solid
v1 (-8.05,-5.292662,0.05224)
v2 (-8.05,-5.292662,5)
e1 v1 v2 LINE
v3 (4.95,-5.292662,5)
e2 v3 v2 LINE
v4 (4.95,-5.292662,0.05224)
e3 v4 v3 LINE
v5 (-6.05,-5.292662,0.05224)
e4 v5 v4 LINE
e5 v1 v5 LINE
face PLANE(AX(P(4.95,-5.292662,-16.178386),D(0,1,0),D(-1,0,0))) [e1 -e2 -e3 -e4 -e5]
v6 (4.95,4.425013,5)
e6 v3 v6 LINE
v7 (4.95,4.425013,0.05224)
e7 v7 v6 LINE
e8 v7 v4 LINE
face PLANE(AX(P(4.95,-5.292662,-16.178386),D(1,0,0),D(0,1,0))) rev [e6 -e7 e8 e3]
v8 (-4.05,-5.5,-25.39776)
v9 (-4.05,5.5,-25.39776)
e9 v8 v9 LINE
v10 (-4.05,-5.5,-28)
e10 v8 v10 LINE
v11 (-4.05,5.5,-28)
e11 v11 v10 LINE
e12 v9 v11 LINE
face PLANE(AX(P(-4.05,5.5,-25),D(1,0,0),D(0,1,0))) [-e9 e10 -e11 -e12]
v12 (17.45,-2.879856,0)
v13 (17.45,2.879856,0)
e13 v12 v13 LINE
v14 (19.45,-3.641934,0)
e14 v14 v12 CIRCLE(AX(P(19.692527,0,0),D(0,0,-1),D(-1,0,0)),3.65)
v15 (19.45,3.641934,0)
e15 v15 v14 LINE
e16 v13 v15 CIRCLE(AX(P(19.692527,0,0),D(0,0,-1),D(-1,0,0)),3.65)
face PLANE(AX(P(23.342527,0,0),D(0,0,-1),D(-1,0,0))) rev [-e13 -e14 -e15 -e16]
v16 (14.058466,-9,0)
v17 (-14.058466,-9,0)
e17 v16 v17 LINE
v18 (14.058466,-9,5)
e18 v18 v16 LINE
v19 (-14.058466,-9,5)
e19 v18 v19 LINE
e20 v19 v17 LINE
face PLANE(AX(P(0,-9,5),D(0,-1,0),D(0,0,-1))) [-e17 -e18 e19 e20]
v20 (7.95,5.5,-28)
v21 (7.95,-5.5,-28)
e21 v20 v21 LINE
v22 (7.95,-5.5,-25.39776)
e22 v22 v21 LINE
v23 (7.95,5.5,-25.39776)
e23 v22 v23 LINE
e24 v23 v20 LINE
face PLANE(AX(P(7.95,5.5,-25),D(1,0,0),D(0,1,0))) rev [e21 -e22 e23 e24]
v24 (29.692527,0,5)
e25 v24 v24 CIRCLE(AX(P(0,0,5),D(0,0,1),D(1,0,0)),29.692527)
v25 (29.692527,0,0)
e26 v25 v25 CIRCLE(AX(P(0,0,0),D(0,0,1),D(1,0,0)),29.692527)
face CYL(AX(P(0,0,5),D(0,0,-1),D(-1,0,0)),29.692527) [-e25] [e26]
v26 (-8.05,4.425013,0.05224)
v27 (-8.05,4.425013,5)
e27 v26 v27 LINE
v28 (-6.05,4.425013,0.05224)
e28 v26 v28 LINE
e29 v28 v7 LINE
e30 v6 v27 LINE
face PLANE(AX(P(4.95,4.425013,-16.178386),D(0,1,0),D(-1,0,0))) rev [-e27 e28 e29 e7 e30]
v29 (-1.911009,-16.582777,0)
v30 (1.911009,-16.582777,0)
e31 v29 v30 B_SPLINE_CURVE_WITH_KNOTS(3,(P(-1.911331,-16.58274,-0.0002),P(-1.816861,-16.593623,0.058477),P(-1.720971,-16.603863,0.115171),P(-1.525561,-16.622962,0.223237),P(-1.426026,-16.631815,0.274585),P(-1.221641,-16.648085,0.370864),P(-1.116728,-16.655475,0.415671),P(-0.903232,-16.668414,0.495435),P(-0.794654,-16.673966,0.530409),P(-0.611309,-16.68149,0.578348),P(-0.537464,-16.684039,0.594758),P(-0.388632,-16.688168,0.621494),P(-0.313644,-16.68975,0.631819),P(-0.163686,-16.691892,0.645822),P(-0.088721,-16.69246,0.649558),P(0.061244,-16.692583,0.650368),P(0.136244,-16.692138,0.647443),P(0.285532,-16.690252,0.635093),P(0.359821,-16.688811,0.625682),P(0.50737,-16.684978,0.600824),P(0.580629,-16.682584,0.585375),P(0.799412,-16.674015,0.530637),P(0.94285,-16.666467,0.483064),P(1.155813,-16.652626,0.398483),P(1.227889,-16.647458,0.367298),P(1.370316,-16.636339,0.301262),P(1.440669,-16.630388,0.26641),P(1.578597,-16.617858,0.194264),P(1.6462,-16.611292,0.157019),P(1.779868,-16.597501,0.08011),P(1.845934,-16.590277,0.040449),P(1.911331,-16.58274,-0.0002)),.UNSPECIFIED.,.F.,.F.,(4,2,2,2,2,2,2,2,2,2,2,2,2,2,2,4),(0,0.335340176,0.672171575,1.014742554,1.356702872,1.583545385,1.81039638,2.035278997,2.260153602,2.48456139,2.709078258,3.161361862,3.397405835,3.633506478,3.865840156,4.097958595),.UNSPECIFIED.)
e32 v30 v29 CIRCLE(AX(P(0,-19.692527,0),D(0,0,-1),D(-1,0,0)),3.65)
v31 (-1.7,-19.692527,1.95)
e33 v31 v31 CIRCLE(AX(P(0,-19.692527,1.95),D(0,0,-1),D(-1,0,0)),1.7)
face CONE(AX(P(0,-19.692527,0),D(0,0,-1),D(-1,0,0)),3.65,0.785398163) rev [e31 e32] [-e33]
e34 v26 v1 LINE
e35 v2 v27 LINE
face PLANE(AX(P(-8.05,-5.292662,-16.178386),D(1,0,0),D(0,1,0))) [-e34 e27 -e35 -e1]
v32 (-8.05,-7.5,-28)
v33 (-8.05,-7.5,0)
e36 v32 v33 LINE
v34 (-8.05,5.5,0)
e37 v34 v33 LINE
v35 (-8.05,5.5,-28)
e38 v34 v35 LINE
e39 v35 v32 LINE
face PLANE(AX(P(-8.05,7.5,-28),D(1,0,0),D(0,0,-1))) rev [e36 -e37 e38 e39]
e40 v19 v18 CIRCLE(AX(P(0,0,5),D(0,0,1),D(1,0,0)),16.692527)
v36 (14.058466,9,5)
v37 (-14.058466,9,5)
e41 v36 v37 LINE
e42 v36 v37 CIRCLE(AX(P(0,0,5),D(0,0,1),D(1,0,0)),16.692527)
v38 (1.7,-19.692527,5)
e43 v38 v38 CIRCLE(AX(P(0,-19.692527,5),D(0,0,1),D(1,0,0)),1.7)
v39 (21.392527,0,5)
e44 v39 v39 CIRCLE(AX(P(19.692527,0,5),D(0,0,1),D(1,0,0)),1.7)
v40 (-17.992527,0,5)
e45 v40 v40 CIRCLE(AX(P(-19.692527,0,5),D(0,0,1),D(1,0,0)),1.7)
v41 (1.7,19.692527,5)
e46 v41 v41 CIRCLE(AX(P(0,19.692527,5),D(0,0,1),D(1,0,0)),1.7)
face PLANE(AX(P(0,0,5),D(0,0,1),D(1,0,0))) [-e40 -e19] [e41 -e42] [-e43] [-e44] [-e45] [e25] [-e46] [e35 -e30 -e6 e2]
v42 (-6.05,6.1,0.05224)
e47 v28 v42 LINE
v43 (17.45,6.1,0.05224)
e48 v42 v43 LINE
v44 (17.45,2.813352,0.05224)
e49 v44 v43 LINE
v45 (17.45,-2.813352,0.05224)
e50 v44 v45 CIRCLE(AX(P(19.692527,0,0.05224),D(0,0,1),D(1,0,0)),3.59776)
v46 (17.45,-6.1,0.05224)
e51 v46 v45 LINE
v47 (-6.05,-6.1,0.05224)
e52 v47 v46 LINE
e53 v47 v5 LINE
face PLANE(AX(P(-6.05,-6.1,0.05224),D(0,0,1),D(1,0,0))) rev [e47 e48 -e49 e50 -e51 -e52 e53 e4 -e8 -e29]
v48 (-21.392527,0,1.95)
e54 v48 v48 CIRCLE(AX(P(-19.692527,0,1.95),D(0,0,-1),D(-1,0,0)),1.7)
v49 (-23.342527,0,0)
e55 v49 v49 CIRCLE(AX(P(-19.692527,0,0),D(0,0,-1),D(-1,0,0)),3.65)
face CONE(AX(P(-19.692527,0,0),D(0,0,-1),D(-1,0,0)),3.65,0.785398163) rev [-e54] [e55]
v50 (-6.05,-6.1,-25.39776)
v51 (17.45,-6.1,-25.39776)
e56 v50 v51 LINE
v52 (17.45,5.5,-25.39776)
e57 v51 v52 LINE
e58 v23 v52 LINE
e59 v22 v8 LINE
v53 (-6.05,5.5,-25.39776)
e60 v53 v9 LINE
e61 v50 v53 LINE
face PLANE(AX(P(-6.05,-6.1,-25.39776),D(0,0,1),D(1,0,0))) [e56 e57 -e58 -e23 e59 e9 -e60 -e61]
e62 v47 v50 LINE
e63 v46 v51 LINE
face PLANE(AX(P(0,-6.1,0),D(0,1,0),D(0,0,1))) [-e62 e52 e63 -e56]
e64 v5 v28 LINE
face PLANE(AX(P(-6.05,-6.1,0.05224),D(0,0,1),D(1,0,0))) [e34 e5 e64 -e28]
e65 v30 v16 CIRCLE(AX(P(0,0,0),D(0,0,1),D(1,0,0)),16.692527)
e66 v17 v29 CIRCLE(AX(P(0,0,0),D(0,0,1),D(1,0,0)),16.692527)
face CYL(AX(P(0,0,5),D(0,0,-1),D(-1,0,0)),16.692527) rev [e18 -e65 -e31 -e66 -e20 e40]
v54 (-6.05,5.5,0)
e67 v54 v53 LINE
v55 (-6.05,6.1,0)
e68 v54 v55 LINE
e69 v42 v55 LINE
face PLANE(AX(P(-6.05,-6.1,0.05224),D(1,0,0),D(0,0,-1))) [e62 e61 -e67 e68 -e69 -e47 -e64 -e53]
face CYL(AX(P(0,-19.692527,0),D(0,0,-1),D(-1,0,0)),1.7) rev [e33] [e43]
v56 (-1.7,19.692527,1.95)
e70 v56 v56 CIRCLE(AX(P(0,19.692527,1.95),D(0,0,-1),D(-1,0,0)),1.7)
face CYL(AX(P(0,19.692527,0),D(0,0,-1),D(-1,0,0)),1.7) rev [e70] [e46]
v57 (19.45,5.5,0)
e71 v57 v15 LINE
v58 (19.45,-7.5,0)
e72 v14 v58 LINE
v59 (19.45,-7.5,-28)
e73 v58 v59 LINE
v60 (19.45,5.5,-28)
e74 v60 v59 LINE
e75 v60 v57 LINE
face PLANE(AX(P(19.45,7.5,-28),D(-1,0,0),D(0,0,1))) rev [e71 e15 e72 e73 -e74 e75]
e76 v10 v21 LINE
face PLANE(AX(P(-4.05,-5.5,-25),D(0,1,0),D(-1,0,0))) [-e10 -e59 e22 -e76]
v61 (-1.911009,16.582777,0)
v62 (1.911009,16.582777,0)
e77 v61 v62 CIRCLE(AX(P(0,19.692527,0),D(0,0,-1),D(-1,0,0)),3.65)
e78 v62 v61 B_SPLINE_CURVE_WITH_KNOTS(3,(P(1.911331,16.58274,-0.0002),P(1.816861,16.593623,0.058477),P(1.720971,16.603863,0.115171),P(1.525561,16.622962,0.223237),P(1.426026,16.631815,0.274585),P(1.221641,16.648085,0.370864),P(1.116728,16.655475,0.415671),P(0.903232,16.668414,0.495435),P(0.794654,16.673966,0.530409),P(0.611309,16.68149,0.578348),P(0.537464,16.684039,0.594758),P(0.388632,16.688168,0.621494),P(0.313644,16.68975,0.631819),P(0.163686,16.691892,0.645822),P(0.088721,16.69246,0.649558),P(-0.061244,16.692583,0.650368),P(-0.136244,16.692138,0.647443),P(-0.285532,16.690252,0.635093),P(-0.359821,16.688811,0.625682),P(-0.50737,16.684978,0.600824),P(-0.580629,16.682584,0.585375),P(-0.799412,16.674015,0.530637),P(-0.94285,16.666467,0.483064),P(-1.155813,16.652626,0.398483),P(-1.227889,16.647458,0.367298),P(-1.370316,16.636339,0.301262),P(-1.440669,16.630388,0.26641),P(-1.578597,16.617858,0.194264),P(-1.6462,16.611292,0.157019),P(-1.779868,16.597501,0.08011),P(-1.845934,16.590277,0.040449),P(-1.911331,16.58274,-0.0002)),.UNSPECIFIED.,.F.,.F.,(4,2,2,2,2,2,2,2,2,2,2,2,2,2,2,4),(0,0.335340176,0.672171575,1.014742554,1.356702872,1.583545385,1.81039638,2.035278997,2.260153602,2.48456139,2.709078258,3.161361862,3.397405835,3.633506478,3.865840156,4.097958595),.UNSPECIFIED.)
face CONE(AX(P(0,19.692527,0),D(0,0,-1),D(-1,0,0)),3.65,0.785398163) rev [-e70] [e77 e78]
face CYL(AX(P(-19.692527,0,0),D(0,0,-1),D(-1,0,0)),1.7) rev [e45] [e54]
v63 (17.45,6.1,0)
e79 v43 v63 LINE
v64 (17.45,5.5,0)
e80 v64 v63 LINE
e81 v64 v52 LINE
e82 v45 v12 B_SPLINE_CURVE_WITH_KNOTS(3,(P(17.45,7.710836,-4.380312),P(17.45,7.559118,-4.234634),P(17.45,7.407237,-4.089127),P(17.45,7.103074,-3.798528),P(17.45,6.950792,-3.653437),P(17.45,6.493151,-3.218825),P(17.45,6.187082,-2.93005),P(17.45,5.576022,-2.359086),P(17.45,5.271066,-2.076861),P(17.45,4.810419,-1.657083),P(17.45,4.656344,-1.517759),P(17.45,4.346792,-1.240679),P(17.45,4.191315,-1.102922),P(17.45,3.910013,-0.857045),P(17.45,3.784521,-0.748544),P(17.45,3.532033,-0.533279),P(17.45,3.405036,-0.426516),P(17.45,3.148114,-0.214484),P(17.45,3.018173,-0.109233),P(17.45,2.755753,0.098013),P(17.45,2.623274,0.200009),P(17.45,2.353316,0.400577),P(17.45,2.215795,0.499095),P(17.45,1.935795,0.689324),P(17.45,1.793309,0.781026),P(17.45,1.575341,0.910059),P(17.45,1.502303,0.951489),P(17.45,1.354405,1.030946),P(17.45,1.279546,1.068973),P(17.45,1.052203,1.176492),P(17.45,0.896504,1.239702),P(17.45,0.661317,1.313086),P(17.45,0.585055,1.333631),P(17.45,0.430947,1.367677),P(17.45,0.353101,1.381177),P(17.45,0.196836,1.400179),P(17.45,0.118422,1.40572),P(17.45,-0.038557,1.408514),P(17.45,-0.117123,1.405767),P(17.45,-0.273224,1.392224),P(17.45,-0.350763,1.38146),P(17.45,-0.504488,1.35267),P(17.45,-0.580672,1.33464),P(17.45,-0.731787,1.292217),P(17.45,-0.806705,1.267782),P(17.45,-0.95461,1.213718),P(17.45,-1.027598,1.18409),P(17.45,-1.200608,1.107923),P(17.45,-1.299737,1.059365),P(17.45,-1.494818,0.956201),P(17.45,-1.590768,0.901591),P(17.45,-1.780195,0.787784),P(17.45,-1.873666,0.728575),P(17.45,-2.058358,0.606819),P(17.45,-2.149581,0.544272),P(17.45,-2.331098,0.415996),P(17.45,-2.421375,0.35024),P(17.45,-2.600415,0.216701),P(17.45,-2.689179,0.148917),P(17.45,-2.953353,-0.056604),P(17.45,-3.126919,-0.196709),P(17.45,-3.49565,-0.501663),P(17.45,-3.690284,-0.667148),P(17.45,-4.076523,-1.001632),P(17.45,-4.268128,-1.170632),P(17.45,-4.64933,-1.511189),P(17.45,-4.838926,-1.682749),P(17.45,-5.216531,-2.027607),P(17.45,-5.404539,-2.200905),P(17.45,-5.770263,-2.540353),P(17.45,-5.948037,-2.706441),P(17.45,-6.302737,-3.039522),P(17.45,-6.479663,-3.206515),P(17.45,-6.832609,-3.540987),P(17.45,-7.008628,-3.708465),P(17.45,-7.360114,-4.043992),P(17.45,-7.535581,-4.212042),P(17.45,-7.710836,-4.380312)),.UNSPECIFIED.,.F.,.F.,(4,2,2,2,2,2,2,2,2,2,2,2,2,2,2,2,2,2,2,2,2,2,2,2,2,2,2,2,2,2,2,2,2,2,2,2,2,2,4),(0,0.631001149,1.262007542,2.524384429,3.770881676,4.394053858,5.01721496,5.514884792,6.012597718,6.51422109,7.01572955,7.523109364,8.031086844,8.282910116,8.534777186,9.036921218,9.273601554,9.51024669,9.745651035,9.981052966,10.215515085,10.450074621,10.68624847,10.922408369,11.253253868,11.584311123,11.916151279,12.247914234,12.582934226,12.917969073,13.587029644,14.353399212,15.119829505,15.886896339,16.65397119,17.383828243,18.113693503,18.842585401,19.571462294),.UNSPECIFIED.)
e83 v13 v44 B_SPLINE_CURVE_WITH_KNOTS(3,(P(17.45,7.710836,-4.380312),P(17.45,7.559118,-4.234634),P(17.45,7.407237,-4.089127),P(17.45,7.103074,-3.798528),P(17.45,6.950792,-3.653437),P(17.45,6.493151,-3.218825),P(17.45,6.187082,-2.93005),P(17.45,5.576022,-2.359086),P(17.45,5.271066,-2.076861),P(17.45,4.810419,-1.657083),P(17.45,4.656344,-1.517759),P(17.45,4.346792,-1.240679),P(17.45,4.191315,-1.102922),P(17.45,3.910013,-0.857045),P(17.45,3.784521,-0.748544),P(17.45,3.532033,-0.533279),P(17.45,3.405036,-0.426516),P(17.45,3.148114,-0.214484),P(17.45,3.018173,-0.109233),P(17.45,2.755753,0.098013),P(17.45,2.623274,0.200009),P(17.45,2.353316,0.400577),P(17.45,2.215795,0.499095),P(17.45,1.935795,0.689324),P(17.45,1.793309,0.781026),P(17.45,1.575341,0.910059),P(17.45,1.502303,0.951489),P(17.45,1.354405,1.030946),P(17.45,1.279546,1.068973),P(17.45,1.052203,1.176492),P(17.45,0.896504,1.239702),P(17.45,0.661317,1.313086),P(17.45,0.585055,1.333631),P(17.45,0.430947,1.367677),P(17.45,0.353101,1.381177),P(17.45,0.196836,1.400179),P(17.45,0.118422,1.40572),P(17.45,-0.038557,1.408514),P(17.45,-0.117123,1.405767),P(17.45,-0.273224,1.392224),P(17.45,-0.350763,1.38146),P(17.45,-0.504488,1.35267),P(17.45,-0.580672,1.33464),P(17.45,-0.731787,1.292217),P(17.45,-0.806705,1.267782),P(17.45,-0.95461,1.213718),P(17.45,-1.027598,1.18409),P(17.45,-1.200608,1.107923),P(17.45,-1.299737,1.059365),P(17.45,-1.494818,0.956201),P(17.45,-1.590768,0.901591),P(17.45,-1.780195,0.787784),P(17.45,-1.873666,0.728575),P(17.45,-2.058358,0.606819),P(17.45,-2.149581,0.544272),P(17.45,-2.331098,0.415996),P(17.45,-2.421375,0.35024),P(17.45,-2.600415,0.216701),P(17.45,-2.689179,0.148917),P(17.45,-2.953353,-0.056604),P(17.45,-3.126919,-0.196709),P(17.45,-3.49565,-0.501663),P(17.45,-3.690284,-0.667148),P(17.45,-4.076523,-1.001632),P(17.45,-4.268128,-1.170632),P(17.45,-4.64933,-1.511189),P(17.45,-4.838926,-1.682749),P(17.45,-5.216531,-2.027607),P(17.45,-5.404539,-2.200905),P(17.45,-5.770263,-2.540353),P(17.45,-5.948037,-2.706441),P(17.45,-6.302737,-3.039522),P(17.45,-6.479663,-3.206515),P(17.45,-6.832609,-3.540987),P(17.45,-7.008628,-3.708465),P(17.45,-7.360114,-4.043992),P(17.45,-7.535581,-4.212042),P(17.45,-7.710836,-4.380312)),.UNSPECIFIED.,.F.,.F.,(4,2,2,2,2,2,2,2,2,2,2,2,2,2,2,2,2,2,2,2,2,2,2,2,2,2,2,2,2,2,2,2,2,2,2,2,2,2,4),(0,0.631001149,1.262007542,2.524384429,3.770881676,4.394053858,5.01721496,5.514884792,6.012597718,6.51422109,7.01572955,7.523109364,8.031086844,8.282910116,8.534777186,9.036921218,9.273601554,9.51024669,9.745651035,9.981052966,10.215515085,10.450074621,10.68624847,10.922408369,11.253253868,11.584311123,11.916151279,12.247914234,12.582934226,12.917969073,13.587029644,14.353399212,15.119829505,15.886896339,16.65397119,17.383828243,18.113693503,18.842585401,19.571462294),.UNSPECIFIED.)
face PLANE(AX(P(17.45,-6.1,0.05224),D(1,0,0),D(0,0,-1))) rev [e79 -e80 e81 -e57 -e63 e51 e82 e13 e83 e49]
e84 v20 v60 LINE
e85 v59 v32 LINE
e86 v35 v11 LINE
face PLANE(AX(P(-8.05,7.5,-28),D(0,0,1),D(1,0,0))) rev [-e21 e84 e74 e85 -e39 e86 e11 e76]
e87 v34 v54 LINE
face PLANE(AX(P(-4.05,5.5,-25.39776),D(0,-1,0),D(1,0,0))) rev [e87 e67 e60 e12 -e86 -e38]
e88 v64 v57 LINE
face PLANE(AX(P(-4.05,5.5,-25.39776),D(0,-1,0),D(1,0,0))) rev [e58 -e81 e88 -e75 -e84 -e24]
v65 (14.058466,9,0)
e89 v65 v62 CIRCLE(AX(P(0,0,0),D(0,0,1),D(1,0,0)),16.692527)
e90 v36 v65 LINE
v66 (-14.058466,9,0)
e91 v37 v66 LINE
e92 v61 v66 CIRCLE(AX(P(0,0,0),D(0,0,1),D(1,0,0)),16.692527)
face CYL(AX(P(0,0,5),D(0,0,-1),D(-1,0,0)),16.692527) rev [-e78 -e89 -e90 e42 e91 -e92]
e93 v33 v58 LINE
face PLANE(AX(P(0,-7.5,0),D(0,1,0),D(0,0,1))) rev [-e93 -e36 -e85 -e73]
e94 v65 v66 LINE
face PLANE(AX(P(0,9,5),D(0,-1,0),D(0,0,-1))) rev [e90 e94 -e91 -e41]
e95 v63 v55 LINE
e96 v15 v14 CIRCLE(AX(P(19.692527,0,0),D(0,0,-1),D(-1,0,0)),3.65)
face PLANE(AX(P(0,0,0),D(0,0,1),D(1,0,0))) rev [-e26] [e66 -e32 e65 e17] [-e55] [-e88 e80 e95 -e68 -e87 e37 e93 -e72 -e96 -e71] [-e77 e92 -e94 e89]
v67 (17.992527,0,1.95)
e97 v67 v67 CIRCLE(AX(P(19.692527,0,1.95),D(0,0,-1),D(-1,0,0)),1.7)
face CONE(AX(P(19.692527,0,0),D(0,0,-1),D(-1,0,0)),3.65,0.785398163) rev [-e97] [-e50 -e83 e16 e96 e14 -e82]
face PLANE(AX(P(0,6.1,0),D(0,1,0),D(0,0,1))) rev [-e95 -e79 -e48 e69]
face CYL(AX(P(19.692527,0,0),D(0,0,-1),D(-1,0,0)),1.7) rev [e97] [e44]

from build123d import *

# Parameters (mm, degrees)
SKETCH1_R                                      = 29.692527183
SKETCH1_R_2                                    = 22.692527183
SKETCH1_R_3                                    = 19.692527183
SKETCH1_R_4                                    = 16.692527183
BOSS_EXTRUDE1_DEPTH                            = 5
SKETCH9_W                                      = 27.5
SKETCH9_H                                      = 28
BOSS_EXTRUDE2_DEPTH                            = 7.5
SKETCH10_W                                     = 23.5
SKETCH10_H                                     = 25.45
CUT_EXTRUDE1_DEPTH                             = 6.1
SKETCH12_W                                     = 12
SKETCH12_H                                     = 11
CUT_EXTRUDE2_DEPTH                             = 3
SKETCH11_W                                     = 13
SKETCH11_H                                     = 9.717675131
CUT_EXTRUDE3_DEPTH                             = 4.947760199
CSK_FOR_M3_FLAT_HEAD_MACHINE_SCREW1_AT_2_COUNT = 2
CSK_FOR_M3_FLAT_HEAD_MACHINE_SCREW1_AT_2_PITCH = 27.84943902
CSK_FOR_M3_FLAT_HEAD_MACHINE_SCREW1_AT_3_COUNT = 2
CSK_FOR_M3_FLAT_HEAD_MACHINE_SCREW1_AT_3_PITCH = 27.84943902
CSK_FOR_M3_FLAT_HEAD_MACHINE_SCREW1_AT_4_COUNT = 2
CSK_FOR_M3_FLAT_HEAD_MACHINE_SCREW1_AT_4_PITCH = 39.385054366
SPLIT1_START                                   = 5.5
SPLIT1_OUTLINE_W                               = 27.5
SPLIT1_OUTLINE_H                               = 28
SPLIT1_DEPTH                                   = 2
SPLIT1_START_2                                 = -28
SPLIT1_2_DEPTH                                 = 28
SPLIT1_3_OUTLINE_W                             = 23.5
SPLIT1_3_OUTLINE_H                             = 0.6
SPLIT1_3_DEPTH                                 = 2.602239801


# Read off the part's stored shape, not the designer's step: Split1
with BuildPart() as part:
    # Sketch1 → Boss-Extrude1 (new body)
    # profile 1 of 4: a face of its own
    with BuildSketch(Plane(origin=(0, 0, 0), x_dir=(-1, 0, 0), z_dir=(0, 0, 1))):
        with Locations(Location((0, 0, 0), (0, 0, 180))):
            Circle(SKETCH1_R)
        Circle(SKETCH1_R_2, mode=Mode.SUBTRACT)
    # profile 2 of 4: a face of its own
    with BuildSketch(Plane(origin=(0, 0, 0), x_dir=(-1, 0, 0), z_dir=(0, 0, 1))):
        Circle(SKETCH1_R_2)
        Circle(SKETCH1_R_3, mode=Mode.SUBTRACT)
    # profile 3 of 4: a face of its own
    with BuildSketch(Plane(origin=(0, 0, 0), x_dir=(-1, 0, 0), z_dir=(0, 0, 1))):
        Circle(SKETCH1_R_3)
        Circle(SKETCH1_R_4, mode=Mode.SUBTRACT)
    # profile 4 of 4: a face of its own
    with BuildSketch(Plane(origin=(0, 0, 0), x_dir=(-1, 0, 0), z_dir=(0, 0, 1))):
        with BuildLine():
            Line((14.058465911, 9), (-14.058465911, 9))
            ThreePointArc((-14.058465911, 9), (-16.692527183, 0), (-14.058465911, -9))
            Line((-14.058465911, -9), (14.058465911, -9))
            ThreePointArc((14.058465911, -9), (16.020483578, -4.688770595), (16.692527183, 0))
            ThreePointArc((16.692527183, 0), (16.020483578, 4.688770595), (14.058465911, 9))
        make_face()
    extrude(amount=BOSS_EXTRUDE1_DEPTH)

    # Sketch9 → Boss-Extrude2 (add, symmetric)
    with BuildSketch(Plane(origin=(0, 0, 0), x_dir=(1, 0, 0), z_dir=(0, 1, 0))):
        with Locations((5.7, 14)):
            Rectangle(SKETCH9_W, SKETCH9_H)
    extrude(amount=BOSS_EXTRUDE2_DEPTH, both=True)

    # Sketch10 → Cut-Extrude1 (cut, symmetric)
    with BuildSketch(Plane(origin=(0, 0, 0), x_dir=(1, 0, 0), z_dir=(0, 1, 0))):
        with Locations((5.7, 12.672760199)):
            Rectangle(SKETCH10_W, SKETCH10_H)
    extrude(amount=CUT_EXTRUDE1_DEPTH, both=True, mode=Mode.SUBTRACT)

    # Sketch12 → Cut-Extrude2 (cut)
    with BuildSketch(Plane.XY.offset(-28)):
        with Locations((1.95, 0)):
            Rectangle(SKETCH12_W, SKETCH12_H)
    extrude(amount=CUT_EXTRUDE2_DEPTH, mode=Mode.SUBTRACT)

    # Sketch11 → Cut-Extrude3 (cut)
    with BuildSketch(Plane.XY.offset(5)):
        with Locations((-1.55, -0.433824782)):
            Rectangle(SKETCH11_W, SKETCH11_H)
    extrude(amount=-CUT_EXTRUDE3_DEPTH, mode=Mode.SUBTRACT)

    # Sketch13 → CSK for M3 Flat Head Machine Screw1 (revolve, cut)
    with BuildSketch(Plane.YZ.offset(-19.692527183)):
        Polygon((0, 0), (0, 13.021463052), (1.7, 12), (1.7, 1.95), (3.65, 0), align=None)
    csk_for_m3_flat_head_machine_screw1 = revolve(axis=Axis((-19.692527183, 0, -6.35), (0, 0, 1)), mode=Mode.SUBTRACT)

    # CSK for M3 Flat Head Machine Screw1 at 2: CSK for M3 Flat Head Machine Screw1 ×2
    with Locations(*[Vector(0.7071067811865476, -0.7071067811865475, 0) * (i * CSK_FOR_M3_FLAT_HEAD_MACHINE_SCREW1_AT_2_PITCH) for i in range(1, CSK_FOR_M3_FLAT_HEAD_MACHINE_SCREW1_AT_2_COUNT)]):
        add(csk_for_m3_flat_head_machine_screw1, mode=Mode.SUBTRACT)

    # CSK for M3 Flat Head Machine Screw1 at 3: CSK for M3 Flat Head Machine Screw1 ×2
    with Locations(*[Vector(0.7071067811865476, 0.7071067811865475, 0) * (i * CSK_FOR_M3_FLAT_HEAD_MACHINE_SCREW1_AT_3_PITCH) for i in range(1, CSK_FOR_M3_FLAT_HEAD_MACHINE_SCREW1_AT_3_COUNT)]):
        add(csk_for_m3_flat_head_machine_screw1, mode=Mode.SUBTRACT)

    # CSK for M3 Flat Head Machine Screw1 at 4: CSK for M3 Flat Head Machine Screw1 ×2
    with Locations(*[(i * CSK_FOR_M3_FLAT_HEAD_MACHINE_SCREW1_AT_4_PITCH, 0, 0) for i in range(1, CSK_FOR_M3_FLAT_HEAD_MACHINE_SCREW1_AT_4_COUNT)]):
        add(csk_for_m3_flat_head_machine_screw1, mode=Mode.SUBTRACT)

    # Split1 outline → Split1 (cut)
    with BuildSketch(Plane(origin=(0, 0, 0), x_dir=(1, 0, 0), z_dir=(0, 1, 0)).offset(SPLIT1_START)):
        with Locations((5.7, 14)):
            Rectangle(SPLIT1_OUTLINE_W, SPLIT1_OUTLINE_H)
    extrude(amount=SPLIT1_DEPTH, mode=Mode.SUBTRACT)


with BuildPart() as body_2:
    # Split1 2 outline → Split1 2 (new body)
    with BuildSketch(Plane.XY.offset(SPLIT1_START_2)):
        Polygon((-8.05, 5.5), (-6.05, 5.5), (-6.05, 6.1), (17.45, 6.1), (17.45, 5.5), (19.45, 5.5), (19.45, 7.5), (-8.05, 7.5), align=None)
    extrude(amount=SPLIT1_2_DEPTH)

    # Split1 3 outline → Split1 3 (add)
    with BuildSketch(Plane.XY.offset(SPLIT1_START_2)):
        with Locations((5.7, 5.8)):
            Rectangle(SPLIT1_3_OUTLINE_W, SPLIT1_3_OUTLINE_H)
    extrude(amount=SPLIT1_3_DEPTH)


solid = part.part
